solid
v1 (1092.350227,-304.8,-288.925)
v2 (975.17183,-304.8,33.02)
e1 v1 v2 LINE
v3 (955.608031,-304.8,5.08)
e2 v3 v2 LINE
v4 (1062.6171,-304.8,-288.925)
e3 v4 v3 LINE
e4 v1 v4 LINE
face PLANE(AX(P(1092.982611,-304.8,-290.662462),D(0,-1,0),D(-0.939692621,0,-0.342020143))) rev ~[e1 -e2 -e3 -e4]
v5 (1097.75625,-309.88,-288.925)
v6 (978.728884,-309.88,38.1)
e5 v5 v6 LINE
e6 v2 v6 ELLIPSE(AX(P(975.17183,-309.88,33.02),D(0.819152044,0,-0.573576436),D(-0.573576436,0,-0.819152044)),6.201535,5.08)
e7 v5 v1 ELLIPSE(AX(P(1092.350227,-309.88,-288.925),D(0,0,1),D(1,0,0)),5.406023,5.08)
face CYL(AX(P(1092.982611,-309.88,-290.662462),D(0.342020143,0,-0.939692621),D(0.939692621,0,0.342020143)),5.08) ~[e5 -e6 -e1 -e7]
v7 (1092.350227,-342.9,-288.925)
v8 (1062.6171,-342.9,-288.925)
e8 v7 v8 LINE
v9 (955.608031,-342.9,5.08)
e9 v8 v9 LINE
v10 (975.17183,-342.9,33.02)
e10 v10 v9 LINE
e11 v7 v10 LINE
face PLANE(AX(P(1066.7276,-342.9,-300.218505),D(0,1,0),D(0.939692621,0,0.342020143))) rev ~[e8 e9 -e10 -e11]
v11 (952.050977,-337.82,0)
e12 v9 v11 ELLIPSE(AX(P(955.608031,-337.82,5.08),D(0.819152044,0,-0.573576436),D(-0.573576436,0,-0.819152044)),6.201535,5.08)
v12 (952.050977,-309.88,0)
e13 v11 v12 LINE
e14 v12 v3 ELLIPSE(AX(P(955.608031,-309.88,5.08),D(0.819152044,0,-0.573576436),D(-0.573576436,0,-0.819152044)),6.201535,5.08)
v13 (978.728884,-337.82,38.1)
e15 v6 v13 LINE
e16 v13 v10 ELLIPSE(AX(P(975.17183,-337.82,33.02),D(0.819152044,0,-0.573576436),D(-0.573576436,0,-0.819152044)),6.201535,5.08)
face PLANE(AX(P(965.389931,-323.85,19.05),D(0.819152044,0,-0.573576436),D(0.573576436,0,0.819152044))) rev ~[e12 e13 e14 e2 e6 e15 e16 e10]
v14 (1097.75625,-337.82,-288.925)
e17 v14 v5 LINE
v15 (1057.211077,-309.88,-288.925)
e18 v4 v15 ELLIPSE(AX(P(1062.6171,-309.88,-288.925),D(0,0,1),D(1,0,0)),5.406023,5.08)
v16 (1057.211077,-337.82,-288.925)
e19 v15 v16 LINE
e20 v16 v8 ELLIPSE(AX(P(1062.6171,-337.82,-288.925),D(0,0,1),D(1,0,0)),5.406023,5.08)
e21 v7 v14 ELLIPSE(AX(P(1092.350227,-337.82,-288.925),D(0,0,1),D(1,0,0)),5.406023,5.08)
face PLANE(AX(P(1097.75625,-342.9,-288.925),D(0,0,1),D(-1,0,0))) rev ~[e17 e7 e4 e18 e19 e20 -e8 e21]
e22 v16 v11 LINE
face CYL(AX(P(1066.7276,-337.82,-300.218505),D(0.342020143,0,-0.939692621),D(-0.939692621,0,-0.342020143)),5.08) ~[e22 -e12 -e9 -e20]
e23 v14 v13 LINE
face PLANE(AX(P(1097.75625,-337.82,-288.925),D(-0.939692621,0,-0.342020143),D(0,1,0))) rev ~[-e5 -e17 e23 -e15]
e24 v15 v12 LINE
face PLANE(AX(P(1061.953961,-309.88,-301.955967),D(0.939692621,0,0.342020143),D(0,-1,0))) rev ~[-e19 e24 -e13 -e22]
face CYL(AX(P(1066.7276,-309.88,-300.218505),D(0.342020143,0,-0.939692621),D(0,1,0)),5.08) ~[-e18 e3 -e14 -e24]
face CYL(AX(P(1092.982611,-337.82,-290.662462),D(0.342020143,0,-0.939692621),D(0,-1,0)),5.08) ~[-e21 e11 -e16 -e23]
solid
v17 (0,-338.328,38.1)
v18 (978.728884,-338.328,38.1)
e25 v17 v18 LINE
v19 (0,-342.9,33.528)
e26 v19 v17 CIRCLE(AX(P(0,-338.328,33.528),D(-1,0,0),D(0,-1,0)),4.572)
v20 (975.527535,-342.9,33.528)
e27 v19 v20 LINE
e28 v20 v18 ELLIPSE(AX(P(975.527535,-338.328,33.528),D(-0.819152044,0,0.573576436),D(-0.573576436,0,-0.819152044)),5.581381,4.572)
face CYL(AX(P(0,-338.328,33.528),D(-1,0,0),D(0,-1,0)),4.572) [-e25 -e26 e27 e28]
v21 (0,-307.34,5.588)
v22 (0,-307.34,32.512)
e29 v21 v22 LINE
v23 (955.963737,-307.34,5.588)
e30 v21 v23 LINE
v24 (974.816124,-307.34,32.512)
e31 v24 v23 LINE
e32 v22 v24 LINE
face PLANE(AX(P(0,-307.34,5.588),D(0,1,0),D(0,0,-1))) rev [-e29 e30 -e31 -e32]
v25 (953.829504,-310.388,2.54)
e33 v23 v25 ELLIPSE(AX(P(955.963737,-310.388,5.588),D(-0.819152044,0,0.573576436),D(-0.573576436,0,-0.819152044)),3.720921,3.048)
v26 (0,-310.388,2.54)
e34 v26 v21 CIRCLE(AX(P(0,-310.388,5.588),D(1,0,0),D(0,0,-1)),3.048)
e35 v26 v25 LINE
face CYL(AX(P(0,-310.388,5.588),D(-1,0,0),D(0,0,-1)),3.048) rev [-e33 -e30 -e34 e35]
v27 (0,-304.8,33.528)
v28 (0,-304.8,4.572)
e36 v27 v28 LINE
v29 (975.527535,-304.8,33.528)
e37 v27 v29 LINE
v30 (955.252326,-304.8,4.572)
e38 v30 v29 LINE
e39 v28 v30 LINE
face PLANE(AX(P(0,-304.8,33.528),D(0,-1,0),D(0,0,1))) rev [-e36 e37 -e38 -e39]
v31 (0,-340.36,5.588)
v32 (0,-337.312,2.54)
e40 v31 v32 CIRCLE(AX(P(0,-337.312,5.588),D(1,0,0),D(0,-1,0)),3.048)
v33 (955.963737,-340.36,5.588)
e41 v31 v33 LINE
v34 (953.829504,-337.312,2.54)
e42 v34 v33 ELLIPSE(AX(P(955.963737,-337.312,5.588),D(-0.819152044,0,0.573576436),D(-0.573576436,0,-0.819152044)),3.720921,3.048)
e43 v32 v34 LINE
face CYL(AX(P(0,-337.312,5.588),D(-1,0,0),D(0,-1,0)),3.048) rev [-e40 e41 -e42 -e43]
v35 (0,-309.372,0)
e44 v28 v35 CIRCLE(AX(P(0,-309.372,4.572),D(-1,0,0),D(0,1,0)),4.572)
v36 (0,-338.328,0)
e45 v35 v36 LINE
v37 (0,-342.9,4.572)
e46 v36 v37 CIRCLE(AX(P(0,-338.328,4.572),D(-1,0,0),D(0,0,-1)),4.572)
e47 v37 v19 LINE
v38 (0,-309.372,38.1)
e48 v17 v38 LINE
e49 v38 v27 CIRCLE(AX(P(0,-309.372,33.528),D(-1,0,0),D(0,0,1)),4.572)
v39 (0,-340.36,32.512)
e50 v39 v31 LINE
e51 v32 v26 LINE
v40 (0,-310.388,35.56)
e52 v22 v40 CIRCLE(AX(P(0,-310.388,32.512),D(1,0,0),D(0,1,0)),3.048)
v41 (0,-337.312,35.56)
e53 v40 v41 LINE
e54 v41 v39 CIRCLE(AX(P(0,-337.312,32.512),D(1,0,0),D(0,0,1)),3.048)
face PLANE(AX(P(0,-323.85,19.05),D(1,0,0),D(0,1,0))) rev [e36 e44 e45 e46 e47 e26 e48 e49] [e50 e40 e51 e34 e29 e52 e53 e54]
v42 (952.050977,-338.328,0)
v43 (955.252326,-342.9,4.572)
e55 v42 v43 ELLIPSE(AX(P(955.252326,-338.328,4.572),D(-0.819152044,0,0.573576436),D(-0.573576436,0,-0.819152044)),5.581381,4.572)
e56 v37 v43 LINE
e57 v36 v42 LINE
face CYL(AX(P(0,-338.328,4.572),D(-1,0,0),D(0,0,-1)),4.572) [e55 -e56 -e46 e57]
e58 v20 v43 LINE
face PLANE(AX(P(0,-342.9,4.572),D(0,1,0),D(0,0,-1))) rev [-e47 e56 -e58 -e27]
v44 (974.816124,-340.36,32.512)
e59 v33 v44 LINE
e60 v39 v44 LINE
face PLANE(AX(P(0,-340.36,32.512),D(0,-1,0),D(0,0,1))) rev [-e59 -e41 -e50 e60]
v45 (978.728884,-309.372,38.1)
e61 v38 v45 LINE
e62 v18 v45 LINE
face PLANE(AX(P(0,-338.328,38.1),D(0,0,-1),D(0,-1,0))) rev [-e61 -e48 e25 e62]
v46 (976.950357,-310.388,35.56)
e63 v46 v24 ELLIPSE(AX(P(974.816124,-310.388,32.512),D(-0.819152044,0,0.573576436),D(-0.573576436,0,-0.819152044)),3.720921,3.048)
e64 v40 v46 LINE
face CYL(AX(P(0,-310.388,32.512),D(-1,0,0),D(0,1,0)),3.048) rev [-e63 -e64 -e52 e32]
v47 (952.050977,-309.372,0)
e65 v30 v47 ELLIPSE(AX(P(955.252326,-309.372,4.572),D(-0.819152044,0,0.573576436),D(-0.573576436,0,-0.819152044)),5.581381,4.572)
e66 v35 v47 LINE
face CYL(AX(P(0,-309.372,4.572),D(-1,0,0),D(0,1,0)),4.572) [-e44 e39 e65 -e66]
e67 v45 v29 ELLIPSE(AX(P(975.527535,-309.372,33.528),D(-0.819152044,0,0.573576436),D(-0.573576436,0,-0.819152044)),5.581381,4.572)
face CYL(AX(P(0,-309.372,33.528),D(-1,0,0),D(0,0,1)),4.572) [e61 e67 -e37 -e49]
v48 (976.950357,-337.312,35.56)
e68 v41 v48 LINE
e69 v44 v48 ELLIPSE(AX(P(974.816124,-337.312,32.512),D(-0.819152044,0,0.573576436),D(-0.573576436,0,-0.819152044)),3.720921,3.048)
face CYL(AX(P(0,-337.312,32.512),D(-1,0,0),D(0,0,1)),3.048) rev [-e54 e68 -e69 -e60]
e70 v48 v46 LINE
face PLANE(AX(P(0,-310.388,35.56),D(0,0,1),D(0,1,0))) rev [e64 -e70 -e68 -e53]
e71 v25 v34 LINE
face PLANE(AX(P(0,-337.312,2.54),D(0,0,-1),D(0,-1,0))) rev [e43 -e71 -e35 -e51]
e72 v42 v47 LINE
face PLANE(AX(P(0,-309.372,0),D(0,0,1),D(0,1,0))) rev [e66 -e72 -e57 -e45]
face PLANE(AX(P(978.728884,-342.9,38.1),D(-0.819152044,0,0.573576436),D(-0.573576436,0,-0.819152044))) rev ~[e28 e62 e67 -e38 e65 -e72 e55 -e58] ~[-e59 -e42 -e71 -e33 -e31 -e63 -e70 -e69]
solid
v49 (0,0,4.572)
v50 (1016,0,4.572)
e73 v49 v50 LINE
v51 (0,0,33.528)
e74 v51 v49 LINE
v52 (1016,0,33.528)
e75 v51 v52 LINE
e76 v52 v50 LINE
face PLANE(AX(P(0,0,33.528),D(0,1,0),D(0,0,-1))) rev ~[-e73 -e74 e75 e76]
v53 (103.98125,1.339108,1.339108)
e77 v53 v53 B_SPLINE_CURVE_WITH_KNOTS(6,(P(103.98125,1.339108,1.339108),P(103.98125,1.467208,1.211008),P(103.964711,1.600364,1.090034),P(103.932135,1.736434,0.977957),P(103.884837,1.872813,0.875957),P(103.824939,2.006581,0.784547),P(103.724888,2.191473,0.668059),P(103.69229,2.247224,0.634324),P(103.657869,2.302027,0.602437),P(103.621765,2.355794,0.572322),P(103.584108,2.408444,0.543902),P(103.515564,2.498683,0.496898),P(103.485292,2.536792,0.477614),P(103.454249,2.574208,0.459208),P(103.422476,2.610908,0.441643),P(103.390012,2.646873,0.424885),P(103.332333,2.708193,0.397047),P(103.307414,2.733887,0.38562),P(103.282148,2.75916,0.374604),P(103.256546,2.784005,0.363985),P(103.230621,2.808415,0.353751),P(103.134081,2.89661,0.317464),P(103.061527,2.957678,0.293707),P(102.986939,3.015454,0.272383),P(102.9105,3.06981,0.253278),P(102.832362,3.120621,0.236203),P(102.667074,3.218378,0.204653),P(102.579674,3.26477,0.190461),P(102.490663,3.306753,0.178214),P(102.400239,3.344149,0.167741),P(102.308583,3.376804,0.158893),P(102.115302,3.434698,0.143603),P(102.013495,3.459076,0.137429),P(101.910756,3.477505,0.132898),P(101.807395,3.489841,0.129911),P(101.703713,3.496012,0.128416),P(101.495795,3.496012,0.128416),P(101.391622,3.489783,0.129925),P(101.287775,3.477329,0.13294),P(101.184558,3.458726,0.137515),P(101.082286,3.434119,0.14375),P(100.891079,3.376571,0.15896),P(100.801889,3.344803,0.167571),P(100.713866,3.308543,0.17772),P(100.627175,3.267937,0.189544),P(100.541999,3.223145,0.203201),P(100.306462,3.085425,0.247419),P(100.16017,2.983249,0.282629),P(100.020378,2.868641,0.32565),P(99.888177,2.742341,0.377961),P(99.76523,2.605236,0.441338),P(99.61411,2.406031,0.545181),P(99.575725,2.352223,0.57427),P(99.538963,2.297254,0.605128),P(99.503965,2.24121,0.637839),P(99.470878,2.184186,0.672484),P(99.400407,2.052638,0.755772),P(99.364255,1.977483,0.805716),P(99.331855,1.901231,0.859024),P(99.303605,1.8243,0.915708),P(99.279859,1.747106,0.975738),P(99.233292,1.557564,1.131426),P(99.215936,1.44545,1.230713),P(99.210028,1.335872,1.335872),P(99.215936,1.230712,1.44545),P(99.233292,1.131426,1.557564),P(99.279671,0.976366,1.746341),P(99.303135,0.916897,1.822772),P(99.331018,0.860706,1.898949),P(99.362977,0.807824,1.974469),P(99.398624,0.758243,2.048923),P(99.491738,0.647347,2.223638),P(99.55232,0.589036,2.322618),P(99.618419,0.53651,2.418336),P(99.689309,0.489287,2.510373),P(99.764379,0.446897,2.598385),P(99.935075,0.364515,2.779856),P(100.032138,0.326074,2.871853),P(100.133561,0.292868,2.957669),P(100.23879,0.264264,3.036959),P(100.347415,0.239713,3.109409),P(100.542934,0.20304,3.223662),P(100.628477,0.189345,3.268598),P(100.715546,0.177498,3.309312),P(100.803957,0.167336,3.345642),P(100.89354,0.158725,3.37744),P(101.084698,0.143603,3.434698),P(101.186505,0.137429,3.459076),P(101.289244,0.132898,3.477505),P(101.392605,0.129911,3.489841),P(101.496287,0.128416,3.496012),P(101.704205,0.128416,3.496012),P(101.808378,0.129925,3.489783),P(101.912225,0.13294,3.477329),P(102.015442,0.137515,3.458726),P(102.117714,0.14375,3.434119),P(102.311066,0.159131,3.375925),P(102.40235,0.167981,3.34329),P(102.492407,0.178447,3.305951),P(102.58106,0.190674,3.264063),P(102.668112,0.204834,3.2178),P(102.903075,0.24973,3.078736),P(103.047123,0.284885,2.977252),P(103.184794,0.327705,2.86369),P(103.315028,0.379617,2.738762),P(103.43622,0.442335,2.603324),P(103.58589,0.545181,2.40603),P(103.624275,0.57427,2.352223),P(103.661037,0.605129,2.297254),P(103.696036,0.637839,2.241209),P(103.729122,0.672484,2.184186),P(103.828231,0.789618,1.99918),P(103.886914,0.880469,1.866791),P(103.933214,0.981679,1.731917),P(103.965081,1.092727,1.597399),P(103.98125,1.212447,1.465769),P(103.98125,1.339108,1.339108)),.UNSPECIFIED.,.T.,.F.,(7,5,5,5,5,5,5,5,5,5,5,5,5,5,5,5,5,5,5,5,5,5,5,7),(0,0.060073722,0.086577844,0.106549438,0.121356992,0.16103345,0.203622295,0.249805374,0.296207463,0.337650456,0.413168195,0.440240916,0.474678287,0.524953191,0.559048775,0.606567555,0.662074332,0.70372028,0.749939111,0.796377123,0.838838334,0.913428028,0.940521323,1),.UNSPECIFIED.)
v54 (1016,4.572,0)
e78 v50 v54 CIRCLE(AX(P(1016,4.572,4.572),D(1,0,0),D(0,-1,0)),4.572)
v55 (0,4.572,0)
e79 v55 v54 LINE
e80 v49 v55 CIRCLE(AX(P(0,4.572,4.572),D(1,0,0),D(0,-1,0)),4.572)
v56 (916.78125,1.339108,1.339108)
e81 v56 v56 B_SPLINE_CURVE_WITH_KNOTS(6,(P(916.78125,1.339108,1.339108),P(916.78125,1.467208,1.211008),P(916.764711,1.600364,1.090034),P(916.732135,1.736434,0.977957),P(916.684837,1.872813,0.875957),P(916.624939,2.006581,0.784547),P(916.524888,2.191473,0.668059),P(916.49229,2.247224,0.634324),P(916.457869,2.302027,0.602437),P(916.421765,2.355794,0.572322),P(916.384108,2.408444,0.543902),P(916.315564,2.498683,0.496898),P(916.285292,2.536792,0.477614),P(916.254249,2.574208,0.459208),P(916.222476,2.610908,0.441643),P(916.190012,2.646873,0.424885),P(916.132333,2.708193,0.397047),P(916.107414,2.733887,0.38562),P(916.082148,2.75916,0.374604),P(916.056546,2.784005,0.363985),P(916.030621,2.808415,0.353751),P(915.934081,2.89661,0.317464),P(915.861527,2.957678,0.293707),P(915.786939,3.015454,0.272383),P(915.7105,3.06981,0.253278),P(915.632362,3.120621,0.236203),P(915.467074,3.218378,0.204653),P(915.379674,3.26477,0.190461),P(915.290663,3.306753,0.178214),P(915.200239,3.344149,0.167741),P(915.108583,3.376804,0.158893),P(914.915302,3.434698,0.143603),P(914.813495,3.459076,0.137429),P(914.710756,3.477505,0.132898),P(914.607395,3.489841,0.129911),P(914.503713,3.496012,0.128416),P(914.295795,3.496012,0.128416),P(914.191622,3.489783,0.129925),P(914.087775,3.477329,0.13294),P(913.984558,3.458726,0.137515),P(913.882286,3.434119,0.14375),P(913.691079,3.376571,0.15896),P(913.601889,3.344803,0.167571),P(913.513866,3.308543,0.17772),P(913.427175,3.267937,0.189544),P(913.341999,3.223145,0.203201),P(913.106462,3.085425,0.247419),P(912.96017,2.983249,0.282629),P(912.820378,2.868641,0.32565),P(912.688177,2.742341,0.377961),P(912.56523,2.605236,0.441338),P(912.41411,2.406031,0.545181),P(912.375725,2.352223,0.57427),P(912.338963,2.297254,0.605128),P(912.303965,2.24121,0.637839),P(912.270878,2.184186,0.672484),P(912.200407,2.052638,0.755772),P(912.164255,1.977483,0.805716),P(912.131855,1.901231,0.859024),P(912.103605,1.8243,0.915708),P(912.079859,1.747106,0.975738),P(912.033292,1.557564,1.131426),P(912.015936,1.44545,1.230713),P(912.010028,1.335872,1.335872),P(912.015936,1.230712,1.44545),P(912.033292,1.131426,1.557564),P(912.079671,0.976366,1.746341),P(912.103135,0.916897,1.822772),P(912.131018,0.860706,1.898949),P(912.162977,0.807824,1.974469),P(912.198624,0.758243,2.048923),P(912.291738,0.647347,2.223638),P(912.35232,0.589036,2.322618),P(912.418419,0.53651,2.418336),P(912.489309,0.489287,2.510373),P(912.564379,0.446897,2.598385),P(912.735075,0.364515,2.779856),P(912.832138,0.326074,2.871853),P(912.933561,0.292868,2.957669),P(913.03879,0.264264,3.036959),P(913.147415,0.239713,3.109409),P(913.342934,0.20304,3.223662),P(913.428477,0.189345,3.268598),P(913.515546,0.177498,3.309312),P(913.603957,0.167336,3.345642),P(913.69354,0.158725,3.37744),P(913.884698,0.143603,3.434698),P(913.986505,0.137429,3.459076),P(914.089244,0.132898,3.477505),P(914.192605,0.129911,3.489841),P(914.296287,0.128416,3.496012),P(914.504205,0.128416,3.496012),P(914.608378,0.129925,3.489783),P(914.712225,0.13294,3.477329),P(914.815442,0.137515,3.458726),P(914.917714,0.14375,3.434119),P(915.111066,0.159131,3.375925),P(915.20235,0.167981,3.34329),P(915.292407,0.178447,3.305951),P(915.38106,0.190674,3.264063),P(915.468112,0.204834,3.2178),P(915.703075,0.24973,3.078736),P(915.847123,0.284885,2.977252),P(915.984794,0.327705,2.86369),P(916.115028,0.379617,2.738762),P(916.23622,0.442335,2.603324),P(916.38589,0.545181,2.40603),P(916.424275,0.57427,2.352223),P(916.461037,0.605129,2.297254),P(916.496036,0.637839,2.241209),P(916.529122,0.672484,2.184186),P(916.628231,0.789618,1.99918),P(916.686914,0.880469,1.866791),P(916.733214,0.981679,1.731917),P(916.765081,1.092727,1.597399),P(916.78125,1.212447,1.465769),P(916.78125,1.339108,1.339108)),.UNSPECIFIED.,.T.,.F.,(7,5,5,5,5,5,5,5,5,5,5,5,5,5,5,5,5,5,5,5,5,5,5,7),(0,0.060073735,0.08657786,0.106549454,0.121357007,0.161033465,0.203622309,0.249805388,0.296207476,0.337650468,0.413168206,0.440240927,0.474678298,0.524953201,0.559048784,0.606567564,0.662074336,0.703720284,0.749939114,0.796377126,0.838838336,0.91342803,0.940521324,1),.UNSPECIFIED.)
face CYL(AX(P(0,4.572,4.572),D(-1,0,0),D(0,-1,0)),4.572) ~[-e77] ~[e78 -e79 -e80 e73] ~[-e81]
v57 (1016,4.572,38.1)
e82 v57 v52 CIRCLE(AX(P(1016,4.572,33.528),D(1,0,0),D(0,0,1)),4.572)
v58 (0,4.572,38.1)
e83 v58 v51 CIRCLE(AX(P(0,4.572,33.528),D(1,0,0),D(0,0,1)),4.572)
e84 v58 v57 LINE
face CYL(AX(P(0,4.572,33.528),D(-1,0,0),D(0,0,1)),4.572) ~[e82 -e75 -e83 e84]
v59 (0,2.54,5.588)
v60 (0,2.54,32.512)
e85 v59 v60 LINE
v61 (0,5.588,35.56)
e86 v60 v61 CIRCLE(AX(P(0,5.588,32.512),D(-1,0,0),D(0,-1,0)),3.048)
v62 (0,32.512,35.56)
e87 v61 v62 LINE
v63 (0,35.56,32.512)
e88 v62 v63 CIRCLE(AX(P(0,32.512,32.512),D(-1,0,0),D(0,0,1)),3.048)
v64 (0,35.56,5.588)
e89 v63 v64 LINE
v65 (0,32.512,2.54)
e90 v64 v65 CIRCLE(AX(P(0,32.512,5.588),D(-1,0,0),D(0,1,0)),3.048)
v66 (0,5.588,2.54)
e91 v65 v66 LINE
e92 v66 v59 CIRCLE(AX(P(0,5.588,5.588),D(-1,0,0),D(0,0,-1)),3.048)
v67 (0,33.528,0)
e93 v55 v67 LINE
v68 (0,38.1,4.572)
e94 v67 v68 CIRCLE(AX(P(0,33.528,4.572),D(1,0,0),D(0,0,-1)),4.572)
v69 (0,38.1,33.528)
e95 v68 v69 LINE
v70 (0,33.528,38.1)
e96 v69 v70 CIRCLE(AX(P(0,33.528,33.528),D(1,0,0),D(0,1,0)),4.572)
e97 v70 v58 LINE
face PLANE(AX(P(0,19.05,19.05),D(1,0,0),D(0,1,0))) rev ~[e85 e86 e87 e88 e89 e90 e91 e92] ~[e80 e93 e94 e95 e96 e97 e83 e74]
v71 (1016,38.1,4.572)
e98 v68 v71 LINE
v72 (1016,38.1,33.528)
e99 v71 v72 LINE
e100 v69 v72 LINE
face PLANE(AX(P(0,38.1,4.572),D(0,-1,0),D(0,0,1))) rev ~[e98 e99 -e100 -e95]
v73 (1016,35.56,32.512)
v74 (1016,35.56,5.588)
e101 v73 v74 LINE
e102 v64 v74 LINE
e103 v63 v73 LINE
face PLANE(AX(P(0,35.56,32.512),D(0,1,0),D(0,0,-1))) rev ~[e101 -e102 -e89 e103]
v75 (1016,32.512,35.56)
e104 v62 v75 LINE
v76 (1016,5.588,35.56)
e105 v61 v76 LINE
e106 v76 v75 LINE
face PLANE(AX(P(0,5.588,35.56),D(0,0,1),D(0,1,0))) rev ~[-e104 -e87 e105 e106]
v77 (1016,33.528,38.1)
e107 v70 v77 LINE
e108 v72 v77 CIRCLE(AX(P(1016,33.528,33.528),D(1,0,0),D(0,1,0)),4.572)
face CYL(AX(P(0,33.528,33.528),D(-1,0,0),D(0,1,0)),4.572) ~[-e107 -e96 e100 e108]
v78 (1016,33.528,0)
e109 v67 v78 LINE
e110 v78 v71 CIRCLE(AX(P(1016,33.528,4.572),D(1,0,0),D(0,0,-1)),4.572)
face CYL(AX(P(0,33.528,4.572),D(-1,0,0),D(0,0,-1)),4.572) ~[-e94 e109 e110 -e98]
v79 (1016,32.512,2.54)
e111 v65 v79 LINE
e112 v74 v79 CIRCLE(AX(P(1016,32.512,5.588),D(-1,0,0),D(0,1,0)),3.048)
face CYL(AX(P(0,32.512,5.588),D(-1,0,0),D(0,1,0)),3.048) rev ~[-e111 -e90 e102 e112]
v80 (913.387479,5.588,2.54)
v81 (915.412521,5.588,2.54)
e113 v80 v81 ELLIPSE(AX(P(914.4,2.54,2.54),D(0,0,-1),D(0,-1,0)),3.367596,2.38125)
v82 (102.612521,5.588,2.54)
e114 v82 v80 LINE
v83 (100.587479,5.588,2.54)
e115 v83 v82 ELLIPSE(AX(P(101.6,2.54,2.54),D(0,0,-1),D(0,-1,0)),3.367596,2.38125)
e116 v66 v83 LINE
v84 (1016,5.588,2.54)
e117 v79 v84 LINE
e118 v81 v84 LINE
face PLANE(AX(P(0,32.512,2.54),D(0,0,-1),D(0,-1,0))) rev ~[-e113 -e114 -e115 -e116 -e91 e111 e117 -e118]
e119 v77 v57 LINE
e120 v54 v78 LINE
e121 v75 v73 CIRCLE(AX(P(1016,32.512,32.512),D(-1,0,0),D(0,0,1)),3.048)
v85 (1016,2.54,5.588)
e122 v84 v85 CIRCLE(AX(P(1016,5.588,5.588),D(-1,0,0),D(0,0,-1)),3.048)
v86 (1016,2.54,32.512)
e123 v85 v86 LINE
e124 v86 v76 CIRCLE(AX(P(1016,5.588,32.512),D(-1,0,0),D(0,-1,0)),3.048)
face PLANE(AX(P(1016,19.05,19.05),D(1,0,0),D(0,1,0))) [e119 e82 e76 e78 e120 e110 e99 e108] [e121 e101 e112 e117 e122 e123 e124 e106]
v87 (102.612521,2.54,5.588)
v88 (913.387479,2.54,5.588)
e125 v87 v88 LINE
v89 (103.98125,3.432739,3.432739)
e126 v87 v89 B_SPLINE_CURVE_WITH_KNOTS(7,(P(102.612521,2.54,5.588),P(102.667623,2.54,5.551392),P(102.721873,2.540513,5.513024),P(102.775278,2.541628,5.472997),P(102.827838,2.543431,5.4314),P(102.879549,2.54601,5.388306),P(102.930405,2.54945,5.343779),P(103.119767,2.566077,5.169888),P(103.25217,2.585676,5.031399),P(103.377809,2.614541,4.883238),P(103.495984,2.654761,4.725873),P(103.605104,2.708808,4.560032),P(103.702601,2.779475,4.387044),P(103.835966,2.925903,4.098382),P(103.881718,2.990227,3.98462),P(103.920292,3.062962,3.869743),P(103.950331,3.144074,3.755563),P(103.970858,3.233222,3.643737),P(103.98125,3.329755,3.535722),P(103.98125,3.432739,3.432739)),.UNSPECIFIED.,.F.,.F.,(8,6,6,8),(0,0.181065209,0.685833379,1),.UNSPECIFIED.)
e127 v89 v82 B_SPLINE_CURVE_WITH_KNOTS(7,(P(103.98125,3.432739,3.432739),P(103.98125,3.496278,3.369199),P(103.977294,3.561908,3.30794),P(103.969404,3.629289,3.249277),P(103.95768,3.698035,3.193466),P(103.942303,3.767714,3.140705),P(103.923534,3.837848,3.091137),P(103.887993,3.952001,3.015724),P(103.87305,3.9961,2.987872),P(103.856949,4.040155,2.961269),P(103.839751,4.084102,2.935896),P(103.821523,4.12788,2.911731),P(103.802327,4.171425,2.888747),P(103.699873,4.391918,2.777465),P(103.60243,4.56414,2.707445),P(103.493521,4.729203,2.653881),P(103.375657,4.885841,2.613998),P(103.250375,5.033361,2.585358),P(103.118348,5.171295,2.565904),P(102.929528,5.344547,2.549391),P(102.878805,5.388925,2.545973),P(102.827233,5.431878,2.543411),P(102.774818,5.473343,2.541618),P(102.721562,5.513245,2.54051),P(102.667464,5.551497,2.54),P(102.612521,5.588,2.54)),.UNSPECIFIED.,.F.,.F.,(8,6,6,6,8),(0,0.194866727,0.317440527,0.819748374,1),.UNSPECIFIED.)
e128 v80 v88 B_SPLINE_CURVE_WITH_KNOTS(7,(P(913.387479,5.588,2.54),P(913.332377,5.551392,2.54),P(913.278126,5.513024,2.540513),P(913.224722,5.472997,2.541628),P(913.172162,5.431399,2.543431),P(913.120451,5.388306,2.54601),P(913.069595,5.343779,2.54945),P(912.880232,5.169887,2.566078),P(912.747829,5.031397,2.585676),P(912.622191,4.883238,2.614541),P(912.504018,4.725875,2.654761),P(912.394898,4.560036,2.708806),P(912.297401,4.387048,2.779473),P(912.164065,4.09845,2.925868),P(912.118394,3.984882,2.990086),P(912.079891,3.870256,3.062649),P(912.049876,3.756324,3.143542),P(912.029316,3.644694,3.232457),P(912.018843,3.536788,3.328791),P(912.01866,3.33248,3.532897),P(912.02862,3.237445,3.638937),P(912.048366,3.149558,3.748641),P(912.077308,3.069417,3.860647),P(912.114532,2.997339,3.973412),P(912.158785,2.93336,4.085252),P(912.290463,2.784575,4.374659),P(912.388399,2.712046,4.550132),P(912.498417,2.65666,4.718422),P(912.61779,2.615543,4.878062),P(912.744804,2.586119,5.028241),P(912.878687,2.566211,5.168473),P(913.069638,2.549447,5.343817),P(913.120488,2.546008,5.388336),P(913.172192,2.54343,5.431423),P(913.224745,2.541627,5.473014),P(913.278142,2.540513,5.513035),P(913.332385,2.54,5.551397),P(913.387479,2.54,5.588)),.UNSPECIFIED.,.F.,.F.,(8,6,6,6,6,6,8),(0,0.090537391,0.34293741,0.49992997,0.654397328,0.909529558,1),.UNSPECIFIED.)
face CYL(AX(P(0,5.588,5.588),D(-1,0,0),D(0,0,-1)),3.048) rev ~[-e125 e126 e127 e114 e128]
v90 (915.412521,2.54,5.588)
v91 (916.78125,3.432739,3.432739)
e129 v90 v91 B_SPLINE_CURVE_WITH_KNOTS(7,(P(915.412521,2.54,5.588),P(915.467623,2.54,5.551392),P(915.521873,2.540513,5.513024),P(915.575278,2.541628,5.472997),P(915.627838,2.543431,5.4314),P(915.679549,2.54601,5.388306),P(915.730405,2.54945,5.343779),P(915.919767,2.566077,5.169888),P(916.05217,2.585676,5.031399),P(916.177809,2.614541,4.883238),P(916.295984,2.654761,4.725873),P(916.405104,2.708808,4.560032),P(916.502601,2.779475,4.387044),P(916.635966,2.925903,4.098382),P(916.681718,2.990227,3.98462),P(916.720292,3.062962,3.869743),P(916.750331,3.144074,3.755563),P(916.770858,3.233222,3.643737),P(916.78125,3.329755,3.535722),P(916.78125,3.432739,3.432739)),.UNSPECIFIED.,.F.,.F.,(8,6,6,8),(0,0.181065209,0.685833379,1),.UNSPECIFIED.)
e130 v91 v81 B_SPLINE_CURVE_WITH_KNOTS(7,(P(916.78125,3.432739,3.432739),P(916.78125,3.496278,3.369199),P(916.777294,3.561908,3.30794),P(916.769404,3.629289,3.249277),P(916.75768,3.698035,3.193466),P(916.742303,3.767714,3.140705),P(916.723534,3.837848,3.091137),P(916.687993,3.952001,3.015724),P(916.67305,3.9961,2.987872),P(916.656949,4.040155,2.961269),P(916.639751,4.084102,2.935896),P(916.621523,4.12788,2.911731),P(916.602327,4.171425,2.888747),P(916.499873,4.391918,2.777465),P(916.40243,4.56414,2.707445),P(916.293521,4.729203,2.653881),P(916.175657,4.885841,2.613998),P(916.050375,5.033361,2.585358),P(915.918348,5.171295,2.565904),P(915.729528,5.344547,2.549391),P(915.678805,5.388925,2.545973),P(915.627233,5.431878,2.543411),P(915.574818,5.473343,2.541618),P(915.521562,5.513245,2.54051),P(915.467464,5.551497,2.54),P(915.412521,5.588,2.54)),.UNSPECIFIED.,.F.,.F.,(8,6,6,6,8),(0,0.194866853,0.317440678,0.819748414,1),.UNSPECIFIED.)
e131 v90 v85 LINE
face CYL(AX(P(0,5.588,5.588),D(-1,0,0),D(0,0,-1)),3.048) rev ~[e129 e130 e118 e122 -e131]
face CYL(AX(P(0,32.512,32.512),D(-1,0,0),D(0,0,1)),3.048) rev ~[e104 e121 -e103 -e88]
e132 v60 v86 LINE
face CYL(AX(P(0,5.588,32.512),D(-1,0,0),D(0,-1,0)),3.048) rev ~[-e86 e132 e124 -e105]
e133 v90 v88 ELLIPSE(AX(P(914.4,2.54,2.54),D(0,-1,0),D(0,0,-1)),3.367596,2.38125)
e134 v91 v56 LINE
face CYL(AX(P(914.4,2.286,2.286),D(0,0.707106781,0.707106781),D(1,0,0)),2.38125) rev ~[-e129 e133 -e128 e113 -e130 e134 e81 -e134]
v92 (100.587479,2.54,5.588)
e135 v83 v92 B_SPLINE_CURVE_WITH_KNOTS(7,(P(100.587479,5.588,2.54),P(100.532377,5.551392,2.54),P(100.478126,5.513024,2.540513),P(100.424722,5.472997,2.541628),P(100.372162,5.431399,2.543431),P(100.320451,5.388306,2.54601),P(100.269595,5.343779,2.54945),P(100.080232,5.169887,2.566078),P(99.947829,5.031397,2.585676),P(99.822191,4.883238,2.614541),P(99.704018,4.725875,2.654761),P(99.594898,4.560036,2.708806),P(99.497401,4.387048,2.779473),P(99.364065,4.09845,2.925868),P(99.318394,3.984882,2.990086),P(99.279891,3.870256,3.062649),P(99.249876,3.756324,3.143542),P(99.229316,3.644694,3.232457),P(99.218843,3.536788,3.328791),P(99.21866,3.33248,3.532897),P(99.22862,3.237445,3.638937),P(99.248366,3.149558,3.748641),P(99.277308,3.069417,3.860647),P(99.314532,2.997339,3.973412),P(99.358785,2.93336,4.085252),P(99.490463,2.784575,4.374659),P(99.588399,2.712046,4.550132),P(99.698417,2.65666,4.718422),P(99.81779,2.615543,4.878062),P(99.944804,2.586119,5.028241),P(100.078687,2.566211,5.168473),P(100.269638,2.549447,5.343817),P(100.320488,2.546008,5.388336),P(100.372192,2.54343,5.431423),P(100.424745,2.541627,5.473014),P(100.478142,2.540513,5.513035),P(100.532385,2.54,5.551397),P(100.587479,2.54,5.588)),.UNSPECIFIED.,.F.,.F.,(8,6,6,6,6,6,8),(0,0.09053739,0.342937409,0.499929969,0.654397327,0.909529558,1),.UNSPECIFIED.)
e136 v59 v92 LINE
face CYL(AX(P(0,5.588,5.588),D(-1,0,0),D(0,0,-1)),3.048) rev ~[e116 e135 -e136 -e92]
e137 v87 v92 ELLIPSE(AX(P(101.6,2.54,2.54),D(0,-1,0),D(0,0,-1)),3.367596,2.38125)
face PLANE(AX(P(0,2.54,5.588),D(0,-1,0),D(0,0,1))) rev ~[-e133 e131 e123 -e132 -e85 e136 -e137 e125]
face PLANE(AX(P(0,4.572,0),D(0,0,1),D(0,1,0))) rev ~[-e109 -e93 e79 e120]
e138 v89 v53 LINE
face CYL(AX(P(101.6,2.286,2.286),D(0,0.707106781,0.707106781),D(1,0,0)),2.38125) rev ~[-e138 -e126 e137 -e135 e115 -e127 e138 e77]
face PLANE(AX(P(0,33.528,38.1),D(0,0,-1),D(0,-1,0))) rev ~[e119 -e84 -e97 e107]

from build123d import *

# Parameters (mm, degrees)
F1_DEPTH      = 1016
F6_R          = 2.38125
F7_DEPTH      = 25.4
F7_DEPTH_BACK = 25.4
F9_DEPTH      = 50.8
F10_DEPTH     = 50.8
F13_REACH     = 736.6402660348
F15_DEPTH     = 50.8


with BuildPart() as f1:
    # F0 (on Right) → F1 (new body)
    with BuildSketch(Plane.YZ):
        with BuildLine():
            ThreePointArc((0, 4.572), (1.3391077964, 1.3391077964), (4.572, 0))
            Line((4.572, 0), (33.528, 0))
            ThreePointArc((33.528, 0), (36.7608922036, 1.3391077964), (38.1, 4.572))
            Line((38.1, 4.572), (38.1, 33.528))
            ThreePointArc((38.1, 33.528), (36.7608922036, 36.7608922036), (33.528, 38.1))
            Line((33.528, 38.1), (4.572, 38.1))
            ThreePointArc((4.572, 38.1), (1.3391077964, 36.7608922036), (0, 33.528))
            Line((0, 33.528), (0, 4.572))
        make_face()
        with BuildLine():
            ThreePointArc((2.54, 32.512), (3.4327385309, 34.6672614691), (5.588, 35.56))
            Line((5.588, 35.56), (32.512, 35.56))
            ThreePointArc((32.512, 35.56), (34.6672614691, 34.6672614691), (35.56, 32.512))
            Line((35.56, 32.512), (35.56, 5.588))
            ThreePointArc((35.56, 5.588), (34.6672614691, 3.4327385309), (32.512, 2.54))
            Line((32.512, 2.54), (5.588, 2.54))
            ThreePointArc((5.588, 2.54), (3.4327385309, 3.4327385309), (2.54, 5.588))
            Line((2.54, 5.588), (2.54, 32.512))
        make_face(mode=Mode.SUBTRACT)
    extrude(amount=F1_DEPTH)


with BuildPart() as f3_1:
    # F3: instance of F1
    add(f1.part.mirror(Plane.XZ.offset(152.4)))

    # F8 (on face) → F9 (cut)
    with BuildSketch(Plane.XZ.offset(342.9)):
        Polygon((978.7288841391, 38.1), (952.0509769333, 0), (947.5085139275, -15.6161198393), (957.4878247443, -14.9376165936), (997.0538689515, -12.2474819838), (1035.239190855, -9.6512240536), (1040.9219264984, 51.4345876873), (1012.4167203903, 54.0863908827), align=None)
    extrude(amount=-F9_DEPTH, mode=Mode.SUBTRACT)


with BuildPart() as f1_1:
    add(f1.part)

    # F6 (on 3pt) → F7 (cut, two sides)
    with BuildSketch(Plane(origin=(0, 2.286, 2.286), x_dir=(1, 0, 0), z_dir=(0, 0.7071067812, 0.7071067812))) as f7_sk:
        with Locations((914.4, 0)):
            Circle(F6_R)
        with Locations((101.6, 0)):
            Circle(F6_R)
    extrude(amount=-F7_DEPTH, mode=Mode.SUBTRACT)
    extrude(f7_sk.sketch, amount=F7_DEPTH_BACK, mode=Mode.SUBTRACT)

    # F8 (on face) → F10 (cut)
    with BuildSketch(Plane.XZ.offset(342.9)):
        Polygon((978.7288841391, 38.1), (952.0509769333, 0), (947.5085139275, -15.6161198393), (957.4878247443, -14.9376165936), (997.0538689515, -12.2474819838), (1035.239190855, -9.6512240536), (1040.9219264984, 51.4345876873), (1012.4167203903, 54.0863908827), align=None)
    extrude(amount=-F10_DEPTH, mode=Mode.SUBTRACT)


with BuildPart() as f13:
    f13_end = Plane(origin=(965.3899305362, -323.85, 19.05), x_dir=(0.5735764364, 0, 0.8191520443), z_dir=(0.8191520443, 0, -0.5735764364))
    # F12 (on line) → F13 (new body, up to a plane its end follows)
    with BuildSketch(Plane(origin=(221.2717924585, 0, -607.9392533421), x_dir=(0.9396926208, 0, 0.3420201433), z_dir=(-0.3420201433, 0, 0.9396926208))):
        with BuildLine():
            ThreePointArc((927.6552776362, -342.9), (931.2473800847, -341.4121024484), (932.7352776362, -337.82))
            Line((932.7352776362, -337.82), (932.7352776362, -309.88))
            ThreePointArc((932.7352776362, -309.88), (931.2473800847, -306.2878975516), (927.6552776362, -304.8))
            Line((927.6552776362, -304.8), (899.7152776362, -304.8))
            ThreePointArc((899.7152776362, -304.8), (896.1231751878, -306.2878975516), (894.6352776362, -309.88))
            Line((894.6352776362, -309.88), (894.6352776362, -337.82))
            ThreePointArc((894.6352776362, -337.82), (896.1231751878, -341.4121024484), (899.7152776362, -342.9))
            Line((899.7152776362, -342.9), (927.6552776362, -342.9))
        make_face()
    f13_long = extrude(amount=F13_REACH, mode=Mode.PRIVATE)
    add(split(f13_long, bisect_by=f13_end, keep=Keep.TOP, mode=Mode.PRIVATE))

    # F14 (on face) → F15 (cut)
    with BuildSketch(Plane.XZ.offset(342.9)):
        Polygon((1097.75625, -288.925), (1018.38125, -288.925), (1040.6295061111, -307.8373670578), (1091.3935899734, -315.6994581223), align=None)
    extrude(amount=-F15_DEPTH, mode=Mode.SUBTRACT)


solid = Compound([f3_1.part, f1_1.part, f13.part])
